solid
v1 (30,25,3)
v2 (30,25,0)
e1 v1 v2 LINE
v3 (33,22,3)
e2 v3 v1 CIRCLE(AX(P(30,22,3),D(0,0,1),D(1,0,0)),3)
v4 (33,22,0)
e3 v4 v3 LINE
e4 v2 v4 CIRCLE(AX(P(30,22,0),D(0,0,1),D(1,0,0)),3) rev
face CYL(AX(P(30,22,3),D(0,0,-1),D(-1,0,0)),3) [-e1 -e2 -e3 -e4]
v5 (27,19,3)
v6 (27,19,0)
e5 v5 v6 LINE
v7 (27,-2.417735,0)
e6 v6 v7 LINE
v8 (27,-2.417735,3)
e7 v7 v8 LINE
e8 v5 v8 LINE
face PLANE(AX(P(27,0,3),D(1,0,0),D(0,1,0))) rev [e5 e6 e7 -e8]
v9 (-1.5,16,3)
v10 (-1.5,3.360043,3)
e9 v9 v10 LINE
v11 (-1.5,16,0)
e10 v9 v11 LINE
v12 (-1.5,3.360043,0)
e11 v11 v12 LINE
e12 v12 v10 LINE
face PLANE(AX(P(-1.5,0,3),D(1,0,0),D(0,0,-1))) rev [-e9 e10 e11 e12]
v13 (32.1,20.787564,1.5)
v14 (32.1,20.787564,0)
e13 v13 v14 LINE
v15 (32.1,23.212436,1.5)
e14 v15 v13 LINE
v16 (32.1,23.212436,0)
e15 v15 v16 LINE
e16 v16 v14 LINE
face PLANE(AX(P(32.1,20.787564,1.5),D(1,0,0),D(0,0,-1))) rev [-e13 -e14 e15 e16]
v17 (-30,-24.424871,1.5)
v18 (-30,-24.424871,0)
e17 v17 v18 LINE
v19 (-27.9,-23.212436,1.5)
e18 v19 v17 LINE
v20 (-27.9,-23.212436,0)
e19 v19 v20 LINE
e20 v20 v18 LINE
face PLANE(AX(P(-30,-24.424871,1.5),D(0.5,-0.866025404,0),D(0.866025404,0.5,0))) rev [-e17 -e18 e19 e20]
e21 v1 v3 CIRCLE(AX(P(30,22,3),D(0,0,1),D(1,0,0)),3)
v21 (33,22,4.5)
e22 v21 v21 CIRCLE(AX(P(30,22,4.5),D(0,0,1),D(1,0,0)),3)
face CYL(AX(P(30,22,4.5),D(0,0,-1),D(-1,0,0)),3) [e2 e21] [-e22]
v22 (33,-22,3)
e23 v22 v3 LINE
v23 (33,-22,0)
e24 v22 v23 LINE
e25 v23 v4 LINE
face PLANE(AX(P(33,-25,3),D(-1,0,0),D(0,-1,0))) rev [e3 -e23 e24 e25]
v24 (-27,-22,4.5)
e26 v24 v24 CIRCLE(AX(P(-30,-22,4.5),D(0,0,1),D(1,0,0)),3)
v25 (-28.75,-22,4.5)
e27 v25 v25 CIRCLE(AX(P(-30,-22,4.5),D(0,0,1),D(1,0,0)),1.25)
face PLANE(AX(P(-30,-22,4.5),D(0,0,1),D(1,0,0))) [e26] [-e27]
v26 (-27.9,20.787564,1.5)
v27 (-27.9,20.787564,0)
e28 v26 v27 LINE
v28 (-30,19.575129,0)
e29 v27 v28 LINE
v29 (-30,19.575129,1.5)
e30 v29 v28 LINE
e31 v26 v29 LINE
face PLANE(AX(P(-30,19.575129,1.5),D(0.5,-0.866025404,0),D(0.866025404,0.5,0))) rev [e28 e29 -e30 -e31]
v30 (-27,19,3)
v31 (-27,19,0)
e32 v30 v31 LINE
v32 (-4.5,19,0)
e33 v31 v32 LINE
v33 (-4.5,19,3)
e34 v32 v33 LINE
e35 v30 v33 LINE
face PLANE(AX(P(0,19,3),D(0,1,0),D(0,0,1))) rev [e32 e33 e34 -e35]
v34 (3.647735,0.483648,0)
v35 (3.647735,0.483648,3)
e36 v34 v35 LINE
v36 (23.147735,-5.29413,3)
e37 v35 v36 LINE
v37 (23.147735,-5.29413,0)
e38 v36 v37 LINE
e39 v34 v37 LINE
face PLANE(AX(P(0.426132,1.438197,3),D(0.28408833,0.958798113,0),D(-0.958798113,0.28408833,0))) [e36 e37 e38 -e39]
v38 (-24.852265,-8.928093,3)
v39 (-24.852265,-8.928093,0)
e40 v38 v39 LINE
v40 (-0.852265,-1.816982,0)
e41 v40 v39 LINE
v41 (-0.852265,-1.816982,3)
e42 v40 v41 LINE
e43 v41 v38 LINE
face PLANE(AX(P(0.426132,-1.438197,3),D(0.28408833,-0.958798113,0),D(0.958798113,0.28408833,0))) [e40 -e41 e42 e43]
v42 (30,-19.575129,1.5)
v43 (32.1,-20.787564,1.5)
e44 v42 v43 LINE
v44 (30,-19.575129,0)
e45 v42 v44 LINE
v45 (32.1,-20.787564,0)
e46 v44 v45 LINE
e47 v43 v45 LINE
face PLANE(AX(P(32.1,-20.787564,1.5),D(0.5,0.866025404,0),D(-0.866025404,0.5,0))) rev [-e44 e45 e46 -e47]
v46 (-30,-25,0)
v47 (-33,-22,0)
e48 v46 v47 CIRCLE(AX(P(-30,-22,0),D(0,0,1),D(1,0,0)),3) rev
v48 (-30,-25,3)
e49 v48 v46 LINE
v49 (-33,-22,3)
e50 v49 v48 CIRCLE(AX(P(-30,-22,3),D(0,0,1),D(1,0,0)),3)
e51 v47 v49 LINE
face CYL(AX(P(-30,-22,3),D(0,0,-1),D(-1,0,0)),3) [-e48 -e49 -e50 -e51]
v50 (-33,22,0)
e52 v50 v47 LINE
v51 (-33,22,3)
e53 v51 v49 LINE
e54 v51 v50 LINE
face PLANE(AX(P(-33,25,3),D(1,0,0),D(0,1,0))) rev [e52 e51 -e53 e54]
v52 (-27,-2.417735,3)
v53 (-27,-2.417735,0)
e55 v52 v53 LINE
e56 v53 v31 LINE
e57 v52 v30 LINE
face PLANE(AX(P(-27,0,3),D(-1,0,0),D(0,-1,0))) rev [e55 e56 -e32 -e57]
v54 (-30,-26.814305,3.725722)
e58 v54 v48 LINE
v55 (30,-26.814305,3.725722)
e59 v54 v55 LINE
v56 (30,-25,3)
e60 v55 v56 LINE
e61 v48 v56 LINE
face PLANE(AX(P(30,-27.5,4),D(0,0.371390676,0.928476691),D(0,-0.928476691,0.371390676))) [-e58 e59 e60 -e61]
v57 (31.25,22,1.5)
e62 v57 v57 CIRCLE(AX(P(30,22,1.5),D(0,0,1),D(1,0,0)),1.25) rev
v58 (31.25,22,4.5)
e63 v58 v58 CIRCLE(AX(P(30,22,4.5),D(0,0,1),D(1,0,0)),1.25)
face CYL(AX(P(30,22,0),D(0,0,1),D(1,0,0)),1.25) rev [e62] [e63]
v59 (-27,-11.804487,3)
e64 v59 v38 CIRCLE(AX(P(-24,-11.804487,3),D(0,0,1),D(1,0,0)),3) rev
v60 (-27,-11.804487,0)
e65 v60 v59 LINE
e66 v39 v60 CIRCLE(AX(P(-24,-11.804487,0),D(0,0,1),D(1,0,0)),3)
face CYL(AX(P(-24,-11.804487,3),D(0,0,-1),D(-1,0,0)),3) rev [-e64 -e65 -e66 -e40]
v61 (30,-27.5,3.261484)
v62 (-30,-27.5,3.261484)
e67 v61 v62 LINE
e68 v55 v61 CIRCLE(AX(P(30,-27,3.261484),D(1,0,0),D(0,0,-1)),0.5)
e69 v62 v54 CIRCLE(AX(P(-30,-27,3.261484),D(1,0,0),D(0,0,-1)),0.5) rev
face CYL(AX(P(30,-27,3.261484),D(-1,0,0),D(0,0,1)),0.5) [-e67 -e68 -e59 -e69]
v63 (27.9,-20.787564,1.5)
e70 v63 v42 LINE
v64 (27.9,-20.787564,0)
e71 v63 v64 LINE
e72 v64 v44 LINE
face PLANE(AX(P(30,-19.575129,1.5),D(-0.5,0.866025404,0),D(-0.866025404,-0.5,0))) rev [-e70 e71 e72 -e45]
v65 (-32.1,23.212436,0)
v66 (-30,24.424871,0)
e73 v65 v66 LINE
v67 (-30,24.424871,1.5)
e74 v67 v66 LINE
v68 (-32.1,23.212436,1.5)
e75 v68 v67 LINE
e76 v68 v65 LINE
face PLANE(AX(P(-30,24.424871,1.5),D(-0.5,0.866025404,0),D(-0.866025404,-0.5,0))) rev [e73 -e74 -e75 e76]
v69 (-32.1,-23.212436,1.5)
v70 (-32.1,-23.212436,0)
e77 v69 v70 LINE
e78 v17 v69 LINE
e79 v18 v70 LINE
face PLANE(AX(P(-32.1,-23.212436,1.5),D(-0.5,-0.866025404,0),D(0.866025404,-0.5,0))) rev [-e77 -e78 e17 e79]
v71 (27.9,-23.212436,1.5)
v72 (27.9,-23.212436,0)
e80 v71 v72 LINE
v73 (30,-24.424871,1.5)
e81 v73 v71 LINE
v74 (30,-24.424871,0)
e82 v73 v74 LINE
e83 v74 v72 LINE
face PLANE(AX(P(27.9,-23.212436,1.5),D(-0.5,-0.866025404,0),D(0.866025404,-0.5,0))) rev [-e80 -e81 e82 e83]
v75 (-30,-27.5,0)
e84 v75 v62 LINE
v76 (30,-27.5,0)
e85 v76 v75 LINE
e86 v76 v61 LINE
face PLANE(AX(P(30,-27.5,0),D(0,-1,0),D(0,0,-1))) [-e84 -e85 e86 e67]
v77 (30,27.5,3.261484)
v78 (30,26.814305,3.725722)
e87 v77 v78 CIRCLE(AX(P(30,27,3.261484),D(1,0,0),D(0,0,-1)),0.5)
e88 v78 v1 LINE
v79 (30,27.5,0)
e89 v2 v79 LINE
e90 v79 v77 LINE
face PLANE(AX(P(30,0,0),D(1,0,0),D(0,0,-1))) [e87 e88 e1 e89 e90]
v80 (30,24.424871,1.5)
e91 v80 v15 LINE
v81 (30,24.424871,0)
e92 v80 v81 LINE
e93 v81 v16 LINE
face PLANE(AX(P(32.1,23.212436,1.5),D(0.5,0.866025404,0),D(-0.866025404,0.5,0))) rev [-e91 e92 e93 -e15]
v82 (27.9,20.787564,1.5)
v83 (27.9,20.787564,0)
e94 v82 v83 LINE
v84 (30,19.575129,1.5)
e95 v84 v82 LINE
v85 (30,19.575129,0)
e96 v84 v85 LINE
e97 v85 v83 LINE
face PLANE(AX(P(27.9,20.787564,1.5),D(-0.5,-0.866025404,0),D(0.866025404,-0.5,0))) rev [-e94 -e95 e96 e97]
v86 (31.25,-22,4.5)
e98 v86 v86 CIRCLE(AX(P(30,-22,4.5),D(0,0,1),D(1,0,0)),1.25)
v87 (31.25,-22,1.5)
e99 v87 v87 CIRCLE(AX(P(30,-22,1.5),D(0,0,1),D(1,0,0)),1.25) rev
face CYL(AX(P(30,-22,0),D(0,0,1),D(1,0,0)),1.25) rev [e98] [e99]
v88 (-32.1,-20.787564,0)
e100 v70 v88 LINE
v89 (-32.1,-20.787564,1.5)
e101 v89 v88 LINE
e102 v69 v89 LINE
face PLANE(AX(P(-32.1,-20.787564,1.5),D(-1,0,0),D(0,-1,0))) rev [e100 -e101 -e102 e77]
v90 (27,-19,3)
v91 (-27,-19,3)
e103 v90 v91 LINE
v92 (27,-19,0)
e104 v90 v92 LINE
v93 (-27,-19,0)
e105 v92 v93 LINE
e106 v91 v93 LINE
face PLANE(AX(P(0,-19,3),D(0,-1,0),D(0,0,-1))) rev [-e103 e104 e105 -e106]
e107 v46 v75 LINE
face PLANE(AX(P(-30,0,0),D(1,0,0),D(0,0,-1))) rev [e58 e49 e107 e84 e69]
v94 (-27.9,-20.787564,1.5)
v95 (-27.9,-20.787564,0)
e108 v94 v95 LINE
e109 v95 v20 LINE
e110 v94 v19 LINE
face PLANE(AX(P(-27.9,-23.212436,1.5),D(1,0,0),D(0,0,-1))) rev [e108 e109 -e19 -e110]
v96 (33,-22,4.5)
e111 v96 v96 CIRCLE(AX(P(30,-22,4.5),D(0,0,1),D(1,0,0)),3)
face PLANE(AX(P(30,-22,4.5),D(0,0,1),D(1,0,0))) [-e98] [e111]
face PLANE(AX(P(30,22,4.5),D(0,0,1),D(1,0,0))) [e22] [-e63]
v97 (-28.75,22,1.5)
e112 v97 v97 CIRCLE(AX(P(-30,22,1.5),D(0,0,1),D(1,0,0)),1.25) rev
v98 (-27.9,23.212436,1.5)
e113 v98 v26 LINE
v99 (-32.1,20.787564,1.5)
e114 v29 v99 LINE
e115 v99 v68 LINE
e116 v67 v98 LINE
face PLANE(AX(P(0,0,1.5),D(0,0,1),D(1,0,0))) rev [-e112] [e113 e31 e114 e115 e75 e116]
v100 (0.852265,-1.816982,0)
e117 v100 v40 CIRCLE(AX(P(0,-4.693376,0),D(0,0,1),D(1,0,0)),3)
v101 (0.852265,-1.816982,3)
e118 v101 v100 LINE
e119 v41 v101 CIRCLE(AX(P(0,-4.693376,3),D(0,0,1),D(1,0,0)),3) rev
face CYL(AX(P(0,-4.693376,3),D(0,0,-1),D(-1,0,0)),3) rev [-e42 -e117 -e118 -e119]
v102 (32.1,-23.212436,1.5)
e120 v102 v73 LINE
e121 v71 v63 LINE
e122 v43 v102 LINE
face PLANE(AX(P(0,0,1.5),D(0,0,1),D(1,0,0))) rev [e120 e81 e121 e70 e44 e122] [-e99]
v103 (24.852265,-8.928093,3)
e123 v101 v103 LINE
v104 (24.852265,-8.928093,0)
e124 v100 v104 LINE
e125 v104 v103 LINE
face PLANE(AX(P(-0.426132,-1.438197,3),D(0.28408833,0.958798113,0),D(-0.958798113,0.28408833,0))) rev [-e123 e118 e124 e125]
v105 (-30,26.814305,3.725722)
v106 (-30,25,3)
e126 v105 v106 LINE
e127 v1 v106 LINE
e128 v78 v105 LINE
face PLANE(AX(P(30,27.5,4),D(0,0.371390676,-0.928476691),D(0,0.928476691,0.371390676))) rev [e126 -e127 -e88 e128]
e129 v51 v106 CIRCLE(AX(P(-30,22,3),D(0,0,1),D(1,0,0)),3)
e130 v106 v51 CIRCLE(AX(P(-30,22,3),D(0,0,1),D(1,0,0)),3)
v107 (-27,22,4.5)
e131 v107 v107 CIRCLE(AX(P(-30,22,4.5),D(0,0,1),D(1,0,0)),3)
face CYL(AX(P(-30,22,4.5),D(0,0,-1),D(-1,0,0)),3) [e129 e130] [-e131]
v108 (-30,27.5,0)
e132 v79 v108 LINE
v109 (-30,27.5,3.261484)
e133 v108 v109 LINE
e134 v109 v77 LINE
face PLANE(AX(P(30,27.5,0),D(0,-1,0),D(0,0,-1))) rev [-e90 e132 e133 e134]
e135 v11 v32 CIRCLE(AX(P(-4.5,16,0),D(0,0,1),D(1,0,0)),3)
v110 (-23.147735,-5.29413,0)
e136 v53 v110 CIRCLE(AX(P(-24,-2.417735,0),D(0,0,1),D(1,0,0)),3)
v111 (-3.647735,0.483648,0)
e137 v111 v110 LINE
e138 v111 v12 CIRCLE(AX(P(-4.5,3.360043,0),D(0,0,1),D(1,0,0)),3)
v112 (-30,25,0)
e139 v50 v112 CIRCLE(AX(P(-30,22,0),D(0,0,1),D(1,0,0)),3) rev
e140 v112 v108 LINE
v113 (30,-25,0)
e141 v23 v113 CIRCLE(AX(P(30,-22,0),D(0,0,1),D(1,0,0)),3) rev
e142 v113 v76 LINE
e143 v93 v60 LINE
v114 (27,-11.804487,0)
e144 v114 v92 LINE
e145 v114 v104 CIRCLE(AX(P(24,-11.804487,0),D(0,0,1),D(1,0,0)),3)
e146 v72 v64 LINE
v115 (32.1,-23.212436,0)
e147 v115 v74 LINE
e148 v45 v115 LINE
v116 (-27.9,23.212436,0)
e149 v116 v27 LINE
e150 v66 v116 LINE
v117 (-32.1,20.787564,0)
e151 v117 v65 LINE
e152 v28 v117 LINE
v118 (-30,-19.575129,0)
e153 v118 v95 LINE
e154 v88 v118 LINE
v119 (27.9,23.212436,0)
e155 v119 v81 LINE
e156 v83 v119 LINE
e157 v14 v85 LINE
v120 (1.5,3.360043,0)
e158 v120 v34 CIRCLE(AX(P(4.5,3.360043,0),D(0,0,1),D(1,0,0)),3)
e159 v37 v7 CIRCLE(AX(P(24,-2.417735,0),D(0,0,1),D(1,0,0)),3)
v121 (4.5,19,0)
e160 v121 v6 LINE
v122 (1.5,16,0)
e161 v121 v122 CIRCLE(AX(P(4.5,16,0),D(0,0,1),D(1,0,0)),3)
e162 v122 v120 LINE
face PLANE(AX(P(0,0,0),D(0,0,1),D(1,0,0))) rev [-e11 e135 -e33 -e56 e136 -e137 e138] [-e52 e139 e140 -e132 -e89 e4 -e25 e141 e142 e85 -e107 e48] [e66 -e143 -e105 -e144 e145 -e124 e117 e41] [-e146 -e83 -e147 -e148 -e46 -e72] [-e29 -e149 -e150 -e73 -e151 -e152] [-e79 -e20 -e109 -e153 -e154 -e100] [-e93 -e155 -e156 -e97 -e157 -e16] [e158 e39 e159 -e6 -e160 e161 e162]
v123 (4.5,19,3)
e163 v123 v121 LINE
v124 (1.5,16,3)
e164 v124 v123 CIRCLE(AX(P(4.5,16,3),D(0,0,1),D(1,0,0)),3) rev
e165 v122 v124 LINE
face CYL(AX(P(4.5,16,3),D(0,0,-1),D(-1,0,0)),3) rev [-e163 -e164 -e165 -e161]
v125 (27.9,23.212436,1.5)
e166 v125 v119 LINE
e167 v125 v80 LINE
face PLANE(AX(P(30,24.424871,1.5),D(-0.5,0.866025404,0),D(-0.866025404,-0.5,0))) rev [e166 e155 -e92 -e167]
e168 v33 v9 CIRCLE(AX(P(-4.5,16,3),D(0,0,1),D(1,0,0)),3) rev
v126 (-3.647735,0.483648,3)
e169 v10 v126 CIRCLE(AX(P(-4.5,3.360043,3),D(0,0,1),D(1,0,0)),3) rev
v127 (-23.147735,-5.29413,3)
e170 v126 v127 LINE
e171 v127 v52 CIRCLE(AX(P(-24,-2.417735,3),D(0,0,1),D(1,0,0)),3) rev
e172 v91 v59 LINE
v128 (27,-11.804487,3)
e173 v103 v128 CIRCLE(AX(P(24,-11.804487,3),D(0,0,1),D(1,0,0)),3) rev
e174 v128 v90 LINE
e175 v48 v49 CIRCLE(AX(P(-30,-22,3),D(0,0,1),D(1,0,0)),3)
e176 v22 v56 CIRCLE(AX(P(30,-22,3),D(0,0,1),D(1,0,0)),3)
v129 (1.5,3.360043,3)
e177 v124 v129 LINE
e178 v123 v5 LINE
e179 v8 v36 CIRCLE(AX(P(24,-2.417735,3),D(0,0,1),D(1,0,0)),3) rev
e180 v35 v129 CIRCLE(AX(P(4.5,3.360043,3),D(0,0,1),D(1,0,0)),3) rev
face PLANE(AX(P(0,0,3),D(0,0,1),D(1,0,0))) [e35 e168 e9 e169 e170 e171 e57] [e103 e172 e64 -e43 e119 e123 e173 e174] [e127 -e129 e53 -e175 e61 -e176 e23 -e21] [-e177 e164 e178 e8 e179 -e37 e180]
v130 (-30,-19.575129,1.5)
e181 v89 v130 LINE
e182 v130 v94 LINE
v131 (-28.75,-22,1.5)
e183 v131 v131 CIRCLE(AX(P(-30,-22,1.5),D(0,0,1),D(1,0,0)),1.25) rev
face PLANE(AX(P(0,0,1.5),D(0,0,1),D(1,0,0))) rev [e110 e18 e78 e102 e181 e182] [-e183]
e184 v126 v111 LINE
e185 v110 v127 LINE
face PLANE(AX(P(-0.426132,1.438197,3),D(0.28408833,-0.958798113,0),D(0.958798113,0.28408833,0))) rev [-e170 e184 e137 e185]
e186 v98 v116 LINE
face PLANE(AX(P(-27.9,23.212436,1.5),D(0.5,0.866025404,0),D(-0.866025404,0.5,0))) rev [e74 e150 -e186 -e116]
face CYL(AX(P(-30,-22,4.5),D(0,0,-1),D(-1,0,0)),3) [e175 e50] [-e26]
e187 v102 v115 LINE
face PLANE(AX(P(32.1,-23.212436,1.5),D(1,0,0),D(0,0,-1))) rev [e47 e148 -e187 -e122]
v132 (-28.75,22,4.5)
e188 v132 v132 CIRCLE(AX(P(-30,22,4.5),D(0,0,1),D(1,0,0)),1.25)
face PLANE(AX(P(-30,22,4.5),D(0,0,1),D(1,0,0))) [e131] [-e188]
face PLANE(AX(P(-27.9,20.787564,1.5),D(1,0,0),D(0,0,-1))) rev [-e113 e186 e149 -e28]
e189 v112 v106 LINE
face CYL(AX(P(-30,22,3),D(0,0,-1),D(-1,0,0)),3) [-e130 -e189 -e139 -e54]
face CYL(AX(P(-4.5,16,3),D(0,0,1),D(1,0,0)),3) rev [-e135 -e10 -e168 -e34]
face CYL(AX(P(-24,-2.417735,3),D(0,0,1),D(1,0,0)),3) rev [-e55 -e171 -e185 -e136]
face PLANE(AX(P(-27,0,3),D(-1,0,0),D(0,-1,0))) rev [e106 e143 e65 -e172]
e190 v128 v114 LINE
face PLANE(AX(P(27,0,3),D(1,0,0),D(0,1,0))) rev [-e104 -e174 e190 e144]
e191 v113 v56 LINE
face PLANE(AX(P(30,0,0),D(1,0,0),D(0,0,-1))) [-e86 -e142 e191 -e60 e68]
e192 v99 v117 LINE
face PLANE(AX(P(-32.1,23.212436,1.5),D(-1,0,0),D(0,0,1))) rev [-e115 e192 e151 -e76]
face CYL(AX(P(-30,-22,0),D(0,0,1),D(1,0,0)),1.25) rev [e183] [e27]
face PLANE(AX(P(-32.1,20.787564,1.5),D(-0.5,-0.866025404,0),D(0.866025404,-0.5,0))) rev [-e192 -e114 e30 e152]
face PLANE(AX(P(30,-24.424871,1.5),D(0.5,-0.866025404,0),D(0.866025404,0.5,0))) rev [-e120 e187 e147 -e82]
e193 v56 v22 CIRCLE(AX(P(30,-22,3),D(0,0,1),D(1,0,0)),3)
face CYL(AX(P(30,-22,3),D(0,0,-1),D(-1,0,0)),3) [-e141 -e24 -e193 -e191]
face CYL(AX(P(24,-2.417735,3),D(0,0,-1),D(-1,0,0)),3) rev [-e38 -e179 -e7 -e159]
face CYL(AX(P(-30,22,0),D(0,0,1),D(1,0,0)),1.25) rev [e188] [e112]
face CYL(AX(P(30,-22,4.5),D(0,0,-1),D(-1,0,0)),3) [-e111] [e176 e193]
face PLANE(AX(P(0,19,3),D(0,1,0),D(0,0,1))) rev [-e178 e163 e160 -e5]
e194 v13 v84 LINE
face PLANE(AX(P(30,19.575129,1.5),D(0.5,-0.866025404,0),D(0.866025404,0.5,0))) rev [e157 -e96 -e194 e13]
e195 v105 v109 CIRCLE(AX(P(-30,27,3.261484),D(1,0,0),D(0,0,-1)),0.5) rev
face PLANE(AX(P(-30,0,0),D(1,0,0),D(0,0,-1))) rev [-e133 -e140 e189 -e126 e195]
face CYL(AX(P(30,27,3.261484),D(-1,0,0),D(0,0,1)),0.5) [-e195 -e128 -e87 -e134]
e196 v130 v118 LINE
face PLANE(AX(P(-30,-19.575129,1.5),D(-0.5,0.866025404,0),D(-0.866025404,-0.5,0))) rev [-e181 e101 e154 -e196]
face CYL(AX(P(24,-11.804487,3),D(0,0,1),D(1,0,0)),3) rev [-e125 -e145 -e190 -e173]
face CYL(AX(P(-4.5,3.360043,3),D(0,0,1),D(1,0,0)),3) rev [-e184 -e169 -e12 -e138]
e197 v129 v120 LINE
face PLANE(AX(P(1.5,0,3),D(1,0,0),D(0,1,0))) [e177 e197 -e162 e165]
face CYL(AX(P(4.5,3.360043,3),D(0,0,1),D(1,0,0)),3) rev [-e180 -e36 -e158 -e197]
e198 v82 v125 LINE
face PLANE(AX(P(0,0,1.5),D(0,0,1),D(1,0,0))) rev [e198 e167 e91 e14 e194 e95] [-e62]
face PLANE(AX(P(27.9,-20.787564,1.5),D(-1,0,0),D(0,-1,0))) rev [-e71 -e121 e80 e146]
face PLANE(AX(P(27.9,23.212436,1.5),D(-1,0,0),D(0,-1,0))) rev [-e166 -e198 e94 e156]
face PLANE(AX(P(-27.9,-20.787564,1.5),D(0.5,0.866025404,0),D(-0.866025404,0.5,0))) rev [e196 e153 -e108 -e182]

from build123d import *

# Parameters (mm, degrees)
SKETCH2_W            = 66
SKETCH2_H            = 50
BOSS_EXTRUDE1_DEPTH  = 3
SKETCH3_R            = 1.25
CUT_EXTRUDE1_DEPTH   = 3
CUT_EXTRUDE2_DEPTH   = 1.5
CUT_EXTRUDE3_DEPTH   = 42.509035161
BOSS_EXTRUDE2_START  = 1.5
SKETCH6_R            = 3
SKETCH6_R_2          = 1.25
BOSS_EXTRUDE2_DEPTH  = 1.5
FILLET1_R            = 3
BOSS_EXTRUDE3_DEPTH  = 30
FILLET2_R            = 0.5
FILLET2_OF_MIRROR1_R = 0.5


with BuildPart() as part:
    # Sketch2 → Boss-Extrude1 (new body)
    with BuildSketch(Plane.XY):
        Rectangle(SKETCH2_W, SKETCH2_H)
    extrude(amount=BOSS_EXTRUDE1_DEPTH)

    # Sketch3 → Cut-Extrude1 (cut)
    with BuildSketch(Plane.XY.offset(3)):
        with Locations((-30, 22)):
            Circle(SKETCH3_R)
        with Locations((30, 22)):
            Circle(SKETCH3_R)
        with Locations((30, -22)):
            Circle(SKETCH3_R)
        with Locations((-30, -22)):
            Circle(SKETCH3_R)
    extrude(amount=-CUT_EXTRUDE1_DEPTH, mode=Mode.SUBTRACT)

    # Sketch4 → Cut-Extrude2 (cut)
    with BuildSketch(Plane(origin=(0, 0, 0), x_dir=(-1, 0, 0), z_dir=(0, 0, -1))):
        Polygon((30, 24.424871131), (32.1, 23.212435565), (32.1, 20.787564435), (30, 19.575128869), (27.9, 20.787564435), (27.9, 23.212435565), align=None)
        Polygon((-30, 24.424871131), (-27.9, 23.212435565), (-27.9, 20.787564435), (-30, 19.575128869), (-32.1, 20.787564435), (-32.1, 23.212435565), align=None)
        Polygon((-30, -19.575128869), (-27.9, -20.787564435), (-27.9, -23.212435565), (-30, -24.424871131), (-32.1, -23.212435565), (-32.1, -20.787564435), align=None)
        Polygon((30, -19.575128869), (32.1, -20.787564435), (32.1, -23.212435565), (30, -24.424871131), (27.9, -23.212435565), (27.9, -20.787564435), align=None)
    extrude(amount=-CUT_EXTRUDE2_DEPTH, mode=Mode.SUBTRACT)

    # Sketch5 → Cut-Extrude3 (cut, through all)
    with BuildSketch(Plane(origin=(0, 0, 0), x_dir=(-1, 0, 0), z_dir=(0, 0, -1))):
        Polygon((-1.5, 1.120014204), (-1.5, 19), (-27, 19), (-27, -6.435541351), align=None)
        Polygon((27, 19), (1.5, 19), (1.5, 1.120014204), (27, -6.435541351), align=None)
        Polygon((0, -1.564458649), (-27, -9.564458649), (-27, -19), (27, -19), (27, -9.564458649), align=None)
    extrude(amount=-CUT_EXTRUDE3_DEPTH, mode=Mode.SUBTRACT)

    # Sketch6 → Boss-Extrude2 (add)
    # profile 1 of 4: a face of its own
    with BuildSketch(Plane.XY.offset(3).offset(BOSS_EXTRUDE2_START)):
        with Locations((30, 22)):
            Circle(SKETCH6_R)
        with Locations((30, 22)):
            Circle(SKETCH6_R_2, mode=Mode.SUBTRACT)
    # profile 2 of 4: a face of its own
    with BuildSketch(Plane.XY.offset(3).offset(BOSS_EXTRUDE2_START)):
        with Locations((-30, 22)):
            Circle(SKETCH6_R)
        with Locations((-30, 22)):
            Circle(SKETCH6_R_2, mode=Mode.SUBTRACT)
    # profile 3 of 4: a face of its own
    with BuildSketch(Plane.XY.offset(3).offset(BOSS_EXTRUDE2_START)):
        with Locations((-30, -22)):
            Circle(SKETCH6_R)
        with Locations((-30, -22)):
            Circle(SKETCH6_R_2, mode=Mode.SUBTRACT)
    # profile 4 of 4: a face of its own
    with BuildSketch(Plane.XY.offset(3).offset(BOSS_EXTRUDE2_START)):
        with Locations((30, -22)):
            Circle(SKETCH6_R)
        with Locations((30, -22)):
            Circle(SKETCH6_R_2, mode=Mode.SUBTRACT)
    extrude(amount=-BOSS_EXTRUDE2_DEPTH)

    # Fillet1
    fillet1_edges = [part.edges().sort_by_distance(p)[0] for p in [
        (27, -9.564458649, 1.5),
        (-27, -9.564458649, 1.5),
        (-27, -6.435541351, 1.5),
        (27, -6.435541351, 1.5),
        (0, -1.564458649, 1.5),
        (1.5, 1.120014204, 1.5),
        (-1.5, 1.120014204, 1.5),
        (1.5, 19, 1.5),
        (-1.5, 19, 1.5),
        (-33, 25, 1.5),
        (-33, -25, 1.5),
        (33, -25, 1.5),
        (33, 25, 1.5),
    ]]
    fillet(fillet1_edges, radius=FILLET1_R)

    # Sketch7 → Boss-Extrude3 (add, symmetric)
    with BuildSketch(Plane(origin=(0, 0, 0), x_dir=(0, 0, -1), z_dir=(1, 0, 0))):
        Polygon((0, 25), (0, 27.5), (-4, 27.5), (-3, 25), align=None)
    boss_extrude3 = extrude(amount=BOSS_EXTRUDE3_DEPTH, both=True)

    # Fillet2
    fillet2_edges = [part.edges().sort_by_distance(p)[0] for p in [
        (0, 27.5, 4),
    ]]
    fillet(fillet2_edges, radius=FILLET2_R)

    # Mirror1: Boss-Extrude3 across plane
    add(boss_extrude3.mirror(Plane.ZX))

    # Fillet2 of Mirror1
    fillet2_of_mirror1_edges = [part.edges().sort_by_distance(p)[0] for p in [
        (0, -27.5, 4),
    ]]
    fillet(fillet2_of_mirror1_edges, radius=FILLET2_OF_MIRROR1_R)


solid = part.part
